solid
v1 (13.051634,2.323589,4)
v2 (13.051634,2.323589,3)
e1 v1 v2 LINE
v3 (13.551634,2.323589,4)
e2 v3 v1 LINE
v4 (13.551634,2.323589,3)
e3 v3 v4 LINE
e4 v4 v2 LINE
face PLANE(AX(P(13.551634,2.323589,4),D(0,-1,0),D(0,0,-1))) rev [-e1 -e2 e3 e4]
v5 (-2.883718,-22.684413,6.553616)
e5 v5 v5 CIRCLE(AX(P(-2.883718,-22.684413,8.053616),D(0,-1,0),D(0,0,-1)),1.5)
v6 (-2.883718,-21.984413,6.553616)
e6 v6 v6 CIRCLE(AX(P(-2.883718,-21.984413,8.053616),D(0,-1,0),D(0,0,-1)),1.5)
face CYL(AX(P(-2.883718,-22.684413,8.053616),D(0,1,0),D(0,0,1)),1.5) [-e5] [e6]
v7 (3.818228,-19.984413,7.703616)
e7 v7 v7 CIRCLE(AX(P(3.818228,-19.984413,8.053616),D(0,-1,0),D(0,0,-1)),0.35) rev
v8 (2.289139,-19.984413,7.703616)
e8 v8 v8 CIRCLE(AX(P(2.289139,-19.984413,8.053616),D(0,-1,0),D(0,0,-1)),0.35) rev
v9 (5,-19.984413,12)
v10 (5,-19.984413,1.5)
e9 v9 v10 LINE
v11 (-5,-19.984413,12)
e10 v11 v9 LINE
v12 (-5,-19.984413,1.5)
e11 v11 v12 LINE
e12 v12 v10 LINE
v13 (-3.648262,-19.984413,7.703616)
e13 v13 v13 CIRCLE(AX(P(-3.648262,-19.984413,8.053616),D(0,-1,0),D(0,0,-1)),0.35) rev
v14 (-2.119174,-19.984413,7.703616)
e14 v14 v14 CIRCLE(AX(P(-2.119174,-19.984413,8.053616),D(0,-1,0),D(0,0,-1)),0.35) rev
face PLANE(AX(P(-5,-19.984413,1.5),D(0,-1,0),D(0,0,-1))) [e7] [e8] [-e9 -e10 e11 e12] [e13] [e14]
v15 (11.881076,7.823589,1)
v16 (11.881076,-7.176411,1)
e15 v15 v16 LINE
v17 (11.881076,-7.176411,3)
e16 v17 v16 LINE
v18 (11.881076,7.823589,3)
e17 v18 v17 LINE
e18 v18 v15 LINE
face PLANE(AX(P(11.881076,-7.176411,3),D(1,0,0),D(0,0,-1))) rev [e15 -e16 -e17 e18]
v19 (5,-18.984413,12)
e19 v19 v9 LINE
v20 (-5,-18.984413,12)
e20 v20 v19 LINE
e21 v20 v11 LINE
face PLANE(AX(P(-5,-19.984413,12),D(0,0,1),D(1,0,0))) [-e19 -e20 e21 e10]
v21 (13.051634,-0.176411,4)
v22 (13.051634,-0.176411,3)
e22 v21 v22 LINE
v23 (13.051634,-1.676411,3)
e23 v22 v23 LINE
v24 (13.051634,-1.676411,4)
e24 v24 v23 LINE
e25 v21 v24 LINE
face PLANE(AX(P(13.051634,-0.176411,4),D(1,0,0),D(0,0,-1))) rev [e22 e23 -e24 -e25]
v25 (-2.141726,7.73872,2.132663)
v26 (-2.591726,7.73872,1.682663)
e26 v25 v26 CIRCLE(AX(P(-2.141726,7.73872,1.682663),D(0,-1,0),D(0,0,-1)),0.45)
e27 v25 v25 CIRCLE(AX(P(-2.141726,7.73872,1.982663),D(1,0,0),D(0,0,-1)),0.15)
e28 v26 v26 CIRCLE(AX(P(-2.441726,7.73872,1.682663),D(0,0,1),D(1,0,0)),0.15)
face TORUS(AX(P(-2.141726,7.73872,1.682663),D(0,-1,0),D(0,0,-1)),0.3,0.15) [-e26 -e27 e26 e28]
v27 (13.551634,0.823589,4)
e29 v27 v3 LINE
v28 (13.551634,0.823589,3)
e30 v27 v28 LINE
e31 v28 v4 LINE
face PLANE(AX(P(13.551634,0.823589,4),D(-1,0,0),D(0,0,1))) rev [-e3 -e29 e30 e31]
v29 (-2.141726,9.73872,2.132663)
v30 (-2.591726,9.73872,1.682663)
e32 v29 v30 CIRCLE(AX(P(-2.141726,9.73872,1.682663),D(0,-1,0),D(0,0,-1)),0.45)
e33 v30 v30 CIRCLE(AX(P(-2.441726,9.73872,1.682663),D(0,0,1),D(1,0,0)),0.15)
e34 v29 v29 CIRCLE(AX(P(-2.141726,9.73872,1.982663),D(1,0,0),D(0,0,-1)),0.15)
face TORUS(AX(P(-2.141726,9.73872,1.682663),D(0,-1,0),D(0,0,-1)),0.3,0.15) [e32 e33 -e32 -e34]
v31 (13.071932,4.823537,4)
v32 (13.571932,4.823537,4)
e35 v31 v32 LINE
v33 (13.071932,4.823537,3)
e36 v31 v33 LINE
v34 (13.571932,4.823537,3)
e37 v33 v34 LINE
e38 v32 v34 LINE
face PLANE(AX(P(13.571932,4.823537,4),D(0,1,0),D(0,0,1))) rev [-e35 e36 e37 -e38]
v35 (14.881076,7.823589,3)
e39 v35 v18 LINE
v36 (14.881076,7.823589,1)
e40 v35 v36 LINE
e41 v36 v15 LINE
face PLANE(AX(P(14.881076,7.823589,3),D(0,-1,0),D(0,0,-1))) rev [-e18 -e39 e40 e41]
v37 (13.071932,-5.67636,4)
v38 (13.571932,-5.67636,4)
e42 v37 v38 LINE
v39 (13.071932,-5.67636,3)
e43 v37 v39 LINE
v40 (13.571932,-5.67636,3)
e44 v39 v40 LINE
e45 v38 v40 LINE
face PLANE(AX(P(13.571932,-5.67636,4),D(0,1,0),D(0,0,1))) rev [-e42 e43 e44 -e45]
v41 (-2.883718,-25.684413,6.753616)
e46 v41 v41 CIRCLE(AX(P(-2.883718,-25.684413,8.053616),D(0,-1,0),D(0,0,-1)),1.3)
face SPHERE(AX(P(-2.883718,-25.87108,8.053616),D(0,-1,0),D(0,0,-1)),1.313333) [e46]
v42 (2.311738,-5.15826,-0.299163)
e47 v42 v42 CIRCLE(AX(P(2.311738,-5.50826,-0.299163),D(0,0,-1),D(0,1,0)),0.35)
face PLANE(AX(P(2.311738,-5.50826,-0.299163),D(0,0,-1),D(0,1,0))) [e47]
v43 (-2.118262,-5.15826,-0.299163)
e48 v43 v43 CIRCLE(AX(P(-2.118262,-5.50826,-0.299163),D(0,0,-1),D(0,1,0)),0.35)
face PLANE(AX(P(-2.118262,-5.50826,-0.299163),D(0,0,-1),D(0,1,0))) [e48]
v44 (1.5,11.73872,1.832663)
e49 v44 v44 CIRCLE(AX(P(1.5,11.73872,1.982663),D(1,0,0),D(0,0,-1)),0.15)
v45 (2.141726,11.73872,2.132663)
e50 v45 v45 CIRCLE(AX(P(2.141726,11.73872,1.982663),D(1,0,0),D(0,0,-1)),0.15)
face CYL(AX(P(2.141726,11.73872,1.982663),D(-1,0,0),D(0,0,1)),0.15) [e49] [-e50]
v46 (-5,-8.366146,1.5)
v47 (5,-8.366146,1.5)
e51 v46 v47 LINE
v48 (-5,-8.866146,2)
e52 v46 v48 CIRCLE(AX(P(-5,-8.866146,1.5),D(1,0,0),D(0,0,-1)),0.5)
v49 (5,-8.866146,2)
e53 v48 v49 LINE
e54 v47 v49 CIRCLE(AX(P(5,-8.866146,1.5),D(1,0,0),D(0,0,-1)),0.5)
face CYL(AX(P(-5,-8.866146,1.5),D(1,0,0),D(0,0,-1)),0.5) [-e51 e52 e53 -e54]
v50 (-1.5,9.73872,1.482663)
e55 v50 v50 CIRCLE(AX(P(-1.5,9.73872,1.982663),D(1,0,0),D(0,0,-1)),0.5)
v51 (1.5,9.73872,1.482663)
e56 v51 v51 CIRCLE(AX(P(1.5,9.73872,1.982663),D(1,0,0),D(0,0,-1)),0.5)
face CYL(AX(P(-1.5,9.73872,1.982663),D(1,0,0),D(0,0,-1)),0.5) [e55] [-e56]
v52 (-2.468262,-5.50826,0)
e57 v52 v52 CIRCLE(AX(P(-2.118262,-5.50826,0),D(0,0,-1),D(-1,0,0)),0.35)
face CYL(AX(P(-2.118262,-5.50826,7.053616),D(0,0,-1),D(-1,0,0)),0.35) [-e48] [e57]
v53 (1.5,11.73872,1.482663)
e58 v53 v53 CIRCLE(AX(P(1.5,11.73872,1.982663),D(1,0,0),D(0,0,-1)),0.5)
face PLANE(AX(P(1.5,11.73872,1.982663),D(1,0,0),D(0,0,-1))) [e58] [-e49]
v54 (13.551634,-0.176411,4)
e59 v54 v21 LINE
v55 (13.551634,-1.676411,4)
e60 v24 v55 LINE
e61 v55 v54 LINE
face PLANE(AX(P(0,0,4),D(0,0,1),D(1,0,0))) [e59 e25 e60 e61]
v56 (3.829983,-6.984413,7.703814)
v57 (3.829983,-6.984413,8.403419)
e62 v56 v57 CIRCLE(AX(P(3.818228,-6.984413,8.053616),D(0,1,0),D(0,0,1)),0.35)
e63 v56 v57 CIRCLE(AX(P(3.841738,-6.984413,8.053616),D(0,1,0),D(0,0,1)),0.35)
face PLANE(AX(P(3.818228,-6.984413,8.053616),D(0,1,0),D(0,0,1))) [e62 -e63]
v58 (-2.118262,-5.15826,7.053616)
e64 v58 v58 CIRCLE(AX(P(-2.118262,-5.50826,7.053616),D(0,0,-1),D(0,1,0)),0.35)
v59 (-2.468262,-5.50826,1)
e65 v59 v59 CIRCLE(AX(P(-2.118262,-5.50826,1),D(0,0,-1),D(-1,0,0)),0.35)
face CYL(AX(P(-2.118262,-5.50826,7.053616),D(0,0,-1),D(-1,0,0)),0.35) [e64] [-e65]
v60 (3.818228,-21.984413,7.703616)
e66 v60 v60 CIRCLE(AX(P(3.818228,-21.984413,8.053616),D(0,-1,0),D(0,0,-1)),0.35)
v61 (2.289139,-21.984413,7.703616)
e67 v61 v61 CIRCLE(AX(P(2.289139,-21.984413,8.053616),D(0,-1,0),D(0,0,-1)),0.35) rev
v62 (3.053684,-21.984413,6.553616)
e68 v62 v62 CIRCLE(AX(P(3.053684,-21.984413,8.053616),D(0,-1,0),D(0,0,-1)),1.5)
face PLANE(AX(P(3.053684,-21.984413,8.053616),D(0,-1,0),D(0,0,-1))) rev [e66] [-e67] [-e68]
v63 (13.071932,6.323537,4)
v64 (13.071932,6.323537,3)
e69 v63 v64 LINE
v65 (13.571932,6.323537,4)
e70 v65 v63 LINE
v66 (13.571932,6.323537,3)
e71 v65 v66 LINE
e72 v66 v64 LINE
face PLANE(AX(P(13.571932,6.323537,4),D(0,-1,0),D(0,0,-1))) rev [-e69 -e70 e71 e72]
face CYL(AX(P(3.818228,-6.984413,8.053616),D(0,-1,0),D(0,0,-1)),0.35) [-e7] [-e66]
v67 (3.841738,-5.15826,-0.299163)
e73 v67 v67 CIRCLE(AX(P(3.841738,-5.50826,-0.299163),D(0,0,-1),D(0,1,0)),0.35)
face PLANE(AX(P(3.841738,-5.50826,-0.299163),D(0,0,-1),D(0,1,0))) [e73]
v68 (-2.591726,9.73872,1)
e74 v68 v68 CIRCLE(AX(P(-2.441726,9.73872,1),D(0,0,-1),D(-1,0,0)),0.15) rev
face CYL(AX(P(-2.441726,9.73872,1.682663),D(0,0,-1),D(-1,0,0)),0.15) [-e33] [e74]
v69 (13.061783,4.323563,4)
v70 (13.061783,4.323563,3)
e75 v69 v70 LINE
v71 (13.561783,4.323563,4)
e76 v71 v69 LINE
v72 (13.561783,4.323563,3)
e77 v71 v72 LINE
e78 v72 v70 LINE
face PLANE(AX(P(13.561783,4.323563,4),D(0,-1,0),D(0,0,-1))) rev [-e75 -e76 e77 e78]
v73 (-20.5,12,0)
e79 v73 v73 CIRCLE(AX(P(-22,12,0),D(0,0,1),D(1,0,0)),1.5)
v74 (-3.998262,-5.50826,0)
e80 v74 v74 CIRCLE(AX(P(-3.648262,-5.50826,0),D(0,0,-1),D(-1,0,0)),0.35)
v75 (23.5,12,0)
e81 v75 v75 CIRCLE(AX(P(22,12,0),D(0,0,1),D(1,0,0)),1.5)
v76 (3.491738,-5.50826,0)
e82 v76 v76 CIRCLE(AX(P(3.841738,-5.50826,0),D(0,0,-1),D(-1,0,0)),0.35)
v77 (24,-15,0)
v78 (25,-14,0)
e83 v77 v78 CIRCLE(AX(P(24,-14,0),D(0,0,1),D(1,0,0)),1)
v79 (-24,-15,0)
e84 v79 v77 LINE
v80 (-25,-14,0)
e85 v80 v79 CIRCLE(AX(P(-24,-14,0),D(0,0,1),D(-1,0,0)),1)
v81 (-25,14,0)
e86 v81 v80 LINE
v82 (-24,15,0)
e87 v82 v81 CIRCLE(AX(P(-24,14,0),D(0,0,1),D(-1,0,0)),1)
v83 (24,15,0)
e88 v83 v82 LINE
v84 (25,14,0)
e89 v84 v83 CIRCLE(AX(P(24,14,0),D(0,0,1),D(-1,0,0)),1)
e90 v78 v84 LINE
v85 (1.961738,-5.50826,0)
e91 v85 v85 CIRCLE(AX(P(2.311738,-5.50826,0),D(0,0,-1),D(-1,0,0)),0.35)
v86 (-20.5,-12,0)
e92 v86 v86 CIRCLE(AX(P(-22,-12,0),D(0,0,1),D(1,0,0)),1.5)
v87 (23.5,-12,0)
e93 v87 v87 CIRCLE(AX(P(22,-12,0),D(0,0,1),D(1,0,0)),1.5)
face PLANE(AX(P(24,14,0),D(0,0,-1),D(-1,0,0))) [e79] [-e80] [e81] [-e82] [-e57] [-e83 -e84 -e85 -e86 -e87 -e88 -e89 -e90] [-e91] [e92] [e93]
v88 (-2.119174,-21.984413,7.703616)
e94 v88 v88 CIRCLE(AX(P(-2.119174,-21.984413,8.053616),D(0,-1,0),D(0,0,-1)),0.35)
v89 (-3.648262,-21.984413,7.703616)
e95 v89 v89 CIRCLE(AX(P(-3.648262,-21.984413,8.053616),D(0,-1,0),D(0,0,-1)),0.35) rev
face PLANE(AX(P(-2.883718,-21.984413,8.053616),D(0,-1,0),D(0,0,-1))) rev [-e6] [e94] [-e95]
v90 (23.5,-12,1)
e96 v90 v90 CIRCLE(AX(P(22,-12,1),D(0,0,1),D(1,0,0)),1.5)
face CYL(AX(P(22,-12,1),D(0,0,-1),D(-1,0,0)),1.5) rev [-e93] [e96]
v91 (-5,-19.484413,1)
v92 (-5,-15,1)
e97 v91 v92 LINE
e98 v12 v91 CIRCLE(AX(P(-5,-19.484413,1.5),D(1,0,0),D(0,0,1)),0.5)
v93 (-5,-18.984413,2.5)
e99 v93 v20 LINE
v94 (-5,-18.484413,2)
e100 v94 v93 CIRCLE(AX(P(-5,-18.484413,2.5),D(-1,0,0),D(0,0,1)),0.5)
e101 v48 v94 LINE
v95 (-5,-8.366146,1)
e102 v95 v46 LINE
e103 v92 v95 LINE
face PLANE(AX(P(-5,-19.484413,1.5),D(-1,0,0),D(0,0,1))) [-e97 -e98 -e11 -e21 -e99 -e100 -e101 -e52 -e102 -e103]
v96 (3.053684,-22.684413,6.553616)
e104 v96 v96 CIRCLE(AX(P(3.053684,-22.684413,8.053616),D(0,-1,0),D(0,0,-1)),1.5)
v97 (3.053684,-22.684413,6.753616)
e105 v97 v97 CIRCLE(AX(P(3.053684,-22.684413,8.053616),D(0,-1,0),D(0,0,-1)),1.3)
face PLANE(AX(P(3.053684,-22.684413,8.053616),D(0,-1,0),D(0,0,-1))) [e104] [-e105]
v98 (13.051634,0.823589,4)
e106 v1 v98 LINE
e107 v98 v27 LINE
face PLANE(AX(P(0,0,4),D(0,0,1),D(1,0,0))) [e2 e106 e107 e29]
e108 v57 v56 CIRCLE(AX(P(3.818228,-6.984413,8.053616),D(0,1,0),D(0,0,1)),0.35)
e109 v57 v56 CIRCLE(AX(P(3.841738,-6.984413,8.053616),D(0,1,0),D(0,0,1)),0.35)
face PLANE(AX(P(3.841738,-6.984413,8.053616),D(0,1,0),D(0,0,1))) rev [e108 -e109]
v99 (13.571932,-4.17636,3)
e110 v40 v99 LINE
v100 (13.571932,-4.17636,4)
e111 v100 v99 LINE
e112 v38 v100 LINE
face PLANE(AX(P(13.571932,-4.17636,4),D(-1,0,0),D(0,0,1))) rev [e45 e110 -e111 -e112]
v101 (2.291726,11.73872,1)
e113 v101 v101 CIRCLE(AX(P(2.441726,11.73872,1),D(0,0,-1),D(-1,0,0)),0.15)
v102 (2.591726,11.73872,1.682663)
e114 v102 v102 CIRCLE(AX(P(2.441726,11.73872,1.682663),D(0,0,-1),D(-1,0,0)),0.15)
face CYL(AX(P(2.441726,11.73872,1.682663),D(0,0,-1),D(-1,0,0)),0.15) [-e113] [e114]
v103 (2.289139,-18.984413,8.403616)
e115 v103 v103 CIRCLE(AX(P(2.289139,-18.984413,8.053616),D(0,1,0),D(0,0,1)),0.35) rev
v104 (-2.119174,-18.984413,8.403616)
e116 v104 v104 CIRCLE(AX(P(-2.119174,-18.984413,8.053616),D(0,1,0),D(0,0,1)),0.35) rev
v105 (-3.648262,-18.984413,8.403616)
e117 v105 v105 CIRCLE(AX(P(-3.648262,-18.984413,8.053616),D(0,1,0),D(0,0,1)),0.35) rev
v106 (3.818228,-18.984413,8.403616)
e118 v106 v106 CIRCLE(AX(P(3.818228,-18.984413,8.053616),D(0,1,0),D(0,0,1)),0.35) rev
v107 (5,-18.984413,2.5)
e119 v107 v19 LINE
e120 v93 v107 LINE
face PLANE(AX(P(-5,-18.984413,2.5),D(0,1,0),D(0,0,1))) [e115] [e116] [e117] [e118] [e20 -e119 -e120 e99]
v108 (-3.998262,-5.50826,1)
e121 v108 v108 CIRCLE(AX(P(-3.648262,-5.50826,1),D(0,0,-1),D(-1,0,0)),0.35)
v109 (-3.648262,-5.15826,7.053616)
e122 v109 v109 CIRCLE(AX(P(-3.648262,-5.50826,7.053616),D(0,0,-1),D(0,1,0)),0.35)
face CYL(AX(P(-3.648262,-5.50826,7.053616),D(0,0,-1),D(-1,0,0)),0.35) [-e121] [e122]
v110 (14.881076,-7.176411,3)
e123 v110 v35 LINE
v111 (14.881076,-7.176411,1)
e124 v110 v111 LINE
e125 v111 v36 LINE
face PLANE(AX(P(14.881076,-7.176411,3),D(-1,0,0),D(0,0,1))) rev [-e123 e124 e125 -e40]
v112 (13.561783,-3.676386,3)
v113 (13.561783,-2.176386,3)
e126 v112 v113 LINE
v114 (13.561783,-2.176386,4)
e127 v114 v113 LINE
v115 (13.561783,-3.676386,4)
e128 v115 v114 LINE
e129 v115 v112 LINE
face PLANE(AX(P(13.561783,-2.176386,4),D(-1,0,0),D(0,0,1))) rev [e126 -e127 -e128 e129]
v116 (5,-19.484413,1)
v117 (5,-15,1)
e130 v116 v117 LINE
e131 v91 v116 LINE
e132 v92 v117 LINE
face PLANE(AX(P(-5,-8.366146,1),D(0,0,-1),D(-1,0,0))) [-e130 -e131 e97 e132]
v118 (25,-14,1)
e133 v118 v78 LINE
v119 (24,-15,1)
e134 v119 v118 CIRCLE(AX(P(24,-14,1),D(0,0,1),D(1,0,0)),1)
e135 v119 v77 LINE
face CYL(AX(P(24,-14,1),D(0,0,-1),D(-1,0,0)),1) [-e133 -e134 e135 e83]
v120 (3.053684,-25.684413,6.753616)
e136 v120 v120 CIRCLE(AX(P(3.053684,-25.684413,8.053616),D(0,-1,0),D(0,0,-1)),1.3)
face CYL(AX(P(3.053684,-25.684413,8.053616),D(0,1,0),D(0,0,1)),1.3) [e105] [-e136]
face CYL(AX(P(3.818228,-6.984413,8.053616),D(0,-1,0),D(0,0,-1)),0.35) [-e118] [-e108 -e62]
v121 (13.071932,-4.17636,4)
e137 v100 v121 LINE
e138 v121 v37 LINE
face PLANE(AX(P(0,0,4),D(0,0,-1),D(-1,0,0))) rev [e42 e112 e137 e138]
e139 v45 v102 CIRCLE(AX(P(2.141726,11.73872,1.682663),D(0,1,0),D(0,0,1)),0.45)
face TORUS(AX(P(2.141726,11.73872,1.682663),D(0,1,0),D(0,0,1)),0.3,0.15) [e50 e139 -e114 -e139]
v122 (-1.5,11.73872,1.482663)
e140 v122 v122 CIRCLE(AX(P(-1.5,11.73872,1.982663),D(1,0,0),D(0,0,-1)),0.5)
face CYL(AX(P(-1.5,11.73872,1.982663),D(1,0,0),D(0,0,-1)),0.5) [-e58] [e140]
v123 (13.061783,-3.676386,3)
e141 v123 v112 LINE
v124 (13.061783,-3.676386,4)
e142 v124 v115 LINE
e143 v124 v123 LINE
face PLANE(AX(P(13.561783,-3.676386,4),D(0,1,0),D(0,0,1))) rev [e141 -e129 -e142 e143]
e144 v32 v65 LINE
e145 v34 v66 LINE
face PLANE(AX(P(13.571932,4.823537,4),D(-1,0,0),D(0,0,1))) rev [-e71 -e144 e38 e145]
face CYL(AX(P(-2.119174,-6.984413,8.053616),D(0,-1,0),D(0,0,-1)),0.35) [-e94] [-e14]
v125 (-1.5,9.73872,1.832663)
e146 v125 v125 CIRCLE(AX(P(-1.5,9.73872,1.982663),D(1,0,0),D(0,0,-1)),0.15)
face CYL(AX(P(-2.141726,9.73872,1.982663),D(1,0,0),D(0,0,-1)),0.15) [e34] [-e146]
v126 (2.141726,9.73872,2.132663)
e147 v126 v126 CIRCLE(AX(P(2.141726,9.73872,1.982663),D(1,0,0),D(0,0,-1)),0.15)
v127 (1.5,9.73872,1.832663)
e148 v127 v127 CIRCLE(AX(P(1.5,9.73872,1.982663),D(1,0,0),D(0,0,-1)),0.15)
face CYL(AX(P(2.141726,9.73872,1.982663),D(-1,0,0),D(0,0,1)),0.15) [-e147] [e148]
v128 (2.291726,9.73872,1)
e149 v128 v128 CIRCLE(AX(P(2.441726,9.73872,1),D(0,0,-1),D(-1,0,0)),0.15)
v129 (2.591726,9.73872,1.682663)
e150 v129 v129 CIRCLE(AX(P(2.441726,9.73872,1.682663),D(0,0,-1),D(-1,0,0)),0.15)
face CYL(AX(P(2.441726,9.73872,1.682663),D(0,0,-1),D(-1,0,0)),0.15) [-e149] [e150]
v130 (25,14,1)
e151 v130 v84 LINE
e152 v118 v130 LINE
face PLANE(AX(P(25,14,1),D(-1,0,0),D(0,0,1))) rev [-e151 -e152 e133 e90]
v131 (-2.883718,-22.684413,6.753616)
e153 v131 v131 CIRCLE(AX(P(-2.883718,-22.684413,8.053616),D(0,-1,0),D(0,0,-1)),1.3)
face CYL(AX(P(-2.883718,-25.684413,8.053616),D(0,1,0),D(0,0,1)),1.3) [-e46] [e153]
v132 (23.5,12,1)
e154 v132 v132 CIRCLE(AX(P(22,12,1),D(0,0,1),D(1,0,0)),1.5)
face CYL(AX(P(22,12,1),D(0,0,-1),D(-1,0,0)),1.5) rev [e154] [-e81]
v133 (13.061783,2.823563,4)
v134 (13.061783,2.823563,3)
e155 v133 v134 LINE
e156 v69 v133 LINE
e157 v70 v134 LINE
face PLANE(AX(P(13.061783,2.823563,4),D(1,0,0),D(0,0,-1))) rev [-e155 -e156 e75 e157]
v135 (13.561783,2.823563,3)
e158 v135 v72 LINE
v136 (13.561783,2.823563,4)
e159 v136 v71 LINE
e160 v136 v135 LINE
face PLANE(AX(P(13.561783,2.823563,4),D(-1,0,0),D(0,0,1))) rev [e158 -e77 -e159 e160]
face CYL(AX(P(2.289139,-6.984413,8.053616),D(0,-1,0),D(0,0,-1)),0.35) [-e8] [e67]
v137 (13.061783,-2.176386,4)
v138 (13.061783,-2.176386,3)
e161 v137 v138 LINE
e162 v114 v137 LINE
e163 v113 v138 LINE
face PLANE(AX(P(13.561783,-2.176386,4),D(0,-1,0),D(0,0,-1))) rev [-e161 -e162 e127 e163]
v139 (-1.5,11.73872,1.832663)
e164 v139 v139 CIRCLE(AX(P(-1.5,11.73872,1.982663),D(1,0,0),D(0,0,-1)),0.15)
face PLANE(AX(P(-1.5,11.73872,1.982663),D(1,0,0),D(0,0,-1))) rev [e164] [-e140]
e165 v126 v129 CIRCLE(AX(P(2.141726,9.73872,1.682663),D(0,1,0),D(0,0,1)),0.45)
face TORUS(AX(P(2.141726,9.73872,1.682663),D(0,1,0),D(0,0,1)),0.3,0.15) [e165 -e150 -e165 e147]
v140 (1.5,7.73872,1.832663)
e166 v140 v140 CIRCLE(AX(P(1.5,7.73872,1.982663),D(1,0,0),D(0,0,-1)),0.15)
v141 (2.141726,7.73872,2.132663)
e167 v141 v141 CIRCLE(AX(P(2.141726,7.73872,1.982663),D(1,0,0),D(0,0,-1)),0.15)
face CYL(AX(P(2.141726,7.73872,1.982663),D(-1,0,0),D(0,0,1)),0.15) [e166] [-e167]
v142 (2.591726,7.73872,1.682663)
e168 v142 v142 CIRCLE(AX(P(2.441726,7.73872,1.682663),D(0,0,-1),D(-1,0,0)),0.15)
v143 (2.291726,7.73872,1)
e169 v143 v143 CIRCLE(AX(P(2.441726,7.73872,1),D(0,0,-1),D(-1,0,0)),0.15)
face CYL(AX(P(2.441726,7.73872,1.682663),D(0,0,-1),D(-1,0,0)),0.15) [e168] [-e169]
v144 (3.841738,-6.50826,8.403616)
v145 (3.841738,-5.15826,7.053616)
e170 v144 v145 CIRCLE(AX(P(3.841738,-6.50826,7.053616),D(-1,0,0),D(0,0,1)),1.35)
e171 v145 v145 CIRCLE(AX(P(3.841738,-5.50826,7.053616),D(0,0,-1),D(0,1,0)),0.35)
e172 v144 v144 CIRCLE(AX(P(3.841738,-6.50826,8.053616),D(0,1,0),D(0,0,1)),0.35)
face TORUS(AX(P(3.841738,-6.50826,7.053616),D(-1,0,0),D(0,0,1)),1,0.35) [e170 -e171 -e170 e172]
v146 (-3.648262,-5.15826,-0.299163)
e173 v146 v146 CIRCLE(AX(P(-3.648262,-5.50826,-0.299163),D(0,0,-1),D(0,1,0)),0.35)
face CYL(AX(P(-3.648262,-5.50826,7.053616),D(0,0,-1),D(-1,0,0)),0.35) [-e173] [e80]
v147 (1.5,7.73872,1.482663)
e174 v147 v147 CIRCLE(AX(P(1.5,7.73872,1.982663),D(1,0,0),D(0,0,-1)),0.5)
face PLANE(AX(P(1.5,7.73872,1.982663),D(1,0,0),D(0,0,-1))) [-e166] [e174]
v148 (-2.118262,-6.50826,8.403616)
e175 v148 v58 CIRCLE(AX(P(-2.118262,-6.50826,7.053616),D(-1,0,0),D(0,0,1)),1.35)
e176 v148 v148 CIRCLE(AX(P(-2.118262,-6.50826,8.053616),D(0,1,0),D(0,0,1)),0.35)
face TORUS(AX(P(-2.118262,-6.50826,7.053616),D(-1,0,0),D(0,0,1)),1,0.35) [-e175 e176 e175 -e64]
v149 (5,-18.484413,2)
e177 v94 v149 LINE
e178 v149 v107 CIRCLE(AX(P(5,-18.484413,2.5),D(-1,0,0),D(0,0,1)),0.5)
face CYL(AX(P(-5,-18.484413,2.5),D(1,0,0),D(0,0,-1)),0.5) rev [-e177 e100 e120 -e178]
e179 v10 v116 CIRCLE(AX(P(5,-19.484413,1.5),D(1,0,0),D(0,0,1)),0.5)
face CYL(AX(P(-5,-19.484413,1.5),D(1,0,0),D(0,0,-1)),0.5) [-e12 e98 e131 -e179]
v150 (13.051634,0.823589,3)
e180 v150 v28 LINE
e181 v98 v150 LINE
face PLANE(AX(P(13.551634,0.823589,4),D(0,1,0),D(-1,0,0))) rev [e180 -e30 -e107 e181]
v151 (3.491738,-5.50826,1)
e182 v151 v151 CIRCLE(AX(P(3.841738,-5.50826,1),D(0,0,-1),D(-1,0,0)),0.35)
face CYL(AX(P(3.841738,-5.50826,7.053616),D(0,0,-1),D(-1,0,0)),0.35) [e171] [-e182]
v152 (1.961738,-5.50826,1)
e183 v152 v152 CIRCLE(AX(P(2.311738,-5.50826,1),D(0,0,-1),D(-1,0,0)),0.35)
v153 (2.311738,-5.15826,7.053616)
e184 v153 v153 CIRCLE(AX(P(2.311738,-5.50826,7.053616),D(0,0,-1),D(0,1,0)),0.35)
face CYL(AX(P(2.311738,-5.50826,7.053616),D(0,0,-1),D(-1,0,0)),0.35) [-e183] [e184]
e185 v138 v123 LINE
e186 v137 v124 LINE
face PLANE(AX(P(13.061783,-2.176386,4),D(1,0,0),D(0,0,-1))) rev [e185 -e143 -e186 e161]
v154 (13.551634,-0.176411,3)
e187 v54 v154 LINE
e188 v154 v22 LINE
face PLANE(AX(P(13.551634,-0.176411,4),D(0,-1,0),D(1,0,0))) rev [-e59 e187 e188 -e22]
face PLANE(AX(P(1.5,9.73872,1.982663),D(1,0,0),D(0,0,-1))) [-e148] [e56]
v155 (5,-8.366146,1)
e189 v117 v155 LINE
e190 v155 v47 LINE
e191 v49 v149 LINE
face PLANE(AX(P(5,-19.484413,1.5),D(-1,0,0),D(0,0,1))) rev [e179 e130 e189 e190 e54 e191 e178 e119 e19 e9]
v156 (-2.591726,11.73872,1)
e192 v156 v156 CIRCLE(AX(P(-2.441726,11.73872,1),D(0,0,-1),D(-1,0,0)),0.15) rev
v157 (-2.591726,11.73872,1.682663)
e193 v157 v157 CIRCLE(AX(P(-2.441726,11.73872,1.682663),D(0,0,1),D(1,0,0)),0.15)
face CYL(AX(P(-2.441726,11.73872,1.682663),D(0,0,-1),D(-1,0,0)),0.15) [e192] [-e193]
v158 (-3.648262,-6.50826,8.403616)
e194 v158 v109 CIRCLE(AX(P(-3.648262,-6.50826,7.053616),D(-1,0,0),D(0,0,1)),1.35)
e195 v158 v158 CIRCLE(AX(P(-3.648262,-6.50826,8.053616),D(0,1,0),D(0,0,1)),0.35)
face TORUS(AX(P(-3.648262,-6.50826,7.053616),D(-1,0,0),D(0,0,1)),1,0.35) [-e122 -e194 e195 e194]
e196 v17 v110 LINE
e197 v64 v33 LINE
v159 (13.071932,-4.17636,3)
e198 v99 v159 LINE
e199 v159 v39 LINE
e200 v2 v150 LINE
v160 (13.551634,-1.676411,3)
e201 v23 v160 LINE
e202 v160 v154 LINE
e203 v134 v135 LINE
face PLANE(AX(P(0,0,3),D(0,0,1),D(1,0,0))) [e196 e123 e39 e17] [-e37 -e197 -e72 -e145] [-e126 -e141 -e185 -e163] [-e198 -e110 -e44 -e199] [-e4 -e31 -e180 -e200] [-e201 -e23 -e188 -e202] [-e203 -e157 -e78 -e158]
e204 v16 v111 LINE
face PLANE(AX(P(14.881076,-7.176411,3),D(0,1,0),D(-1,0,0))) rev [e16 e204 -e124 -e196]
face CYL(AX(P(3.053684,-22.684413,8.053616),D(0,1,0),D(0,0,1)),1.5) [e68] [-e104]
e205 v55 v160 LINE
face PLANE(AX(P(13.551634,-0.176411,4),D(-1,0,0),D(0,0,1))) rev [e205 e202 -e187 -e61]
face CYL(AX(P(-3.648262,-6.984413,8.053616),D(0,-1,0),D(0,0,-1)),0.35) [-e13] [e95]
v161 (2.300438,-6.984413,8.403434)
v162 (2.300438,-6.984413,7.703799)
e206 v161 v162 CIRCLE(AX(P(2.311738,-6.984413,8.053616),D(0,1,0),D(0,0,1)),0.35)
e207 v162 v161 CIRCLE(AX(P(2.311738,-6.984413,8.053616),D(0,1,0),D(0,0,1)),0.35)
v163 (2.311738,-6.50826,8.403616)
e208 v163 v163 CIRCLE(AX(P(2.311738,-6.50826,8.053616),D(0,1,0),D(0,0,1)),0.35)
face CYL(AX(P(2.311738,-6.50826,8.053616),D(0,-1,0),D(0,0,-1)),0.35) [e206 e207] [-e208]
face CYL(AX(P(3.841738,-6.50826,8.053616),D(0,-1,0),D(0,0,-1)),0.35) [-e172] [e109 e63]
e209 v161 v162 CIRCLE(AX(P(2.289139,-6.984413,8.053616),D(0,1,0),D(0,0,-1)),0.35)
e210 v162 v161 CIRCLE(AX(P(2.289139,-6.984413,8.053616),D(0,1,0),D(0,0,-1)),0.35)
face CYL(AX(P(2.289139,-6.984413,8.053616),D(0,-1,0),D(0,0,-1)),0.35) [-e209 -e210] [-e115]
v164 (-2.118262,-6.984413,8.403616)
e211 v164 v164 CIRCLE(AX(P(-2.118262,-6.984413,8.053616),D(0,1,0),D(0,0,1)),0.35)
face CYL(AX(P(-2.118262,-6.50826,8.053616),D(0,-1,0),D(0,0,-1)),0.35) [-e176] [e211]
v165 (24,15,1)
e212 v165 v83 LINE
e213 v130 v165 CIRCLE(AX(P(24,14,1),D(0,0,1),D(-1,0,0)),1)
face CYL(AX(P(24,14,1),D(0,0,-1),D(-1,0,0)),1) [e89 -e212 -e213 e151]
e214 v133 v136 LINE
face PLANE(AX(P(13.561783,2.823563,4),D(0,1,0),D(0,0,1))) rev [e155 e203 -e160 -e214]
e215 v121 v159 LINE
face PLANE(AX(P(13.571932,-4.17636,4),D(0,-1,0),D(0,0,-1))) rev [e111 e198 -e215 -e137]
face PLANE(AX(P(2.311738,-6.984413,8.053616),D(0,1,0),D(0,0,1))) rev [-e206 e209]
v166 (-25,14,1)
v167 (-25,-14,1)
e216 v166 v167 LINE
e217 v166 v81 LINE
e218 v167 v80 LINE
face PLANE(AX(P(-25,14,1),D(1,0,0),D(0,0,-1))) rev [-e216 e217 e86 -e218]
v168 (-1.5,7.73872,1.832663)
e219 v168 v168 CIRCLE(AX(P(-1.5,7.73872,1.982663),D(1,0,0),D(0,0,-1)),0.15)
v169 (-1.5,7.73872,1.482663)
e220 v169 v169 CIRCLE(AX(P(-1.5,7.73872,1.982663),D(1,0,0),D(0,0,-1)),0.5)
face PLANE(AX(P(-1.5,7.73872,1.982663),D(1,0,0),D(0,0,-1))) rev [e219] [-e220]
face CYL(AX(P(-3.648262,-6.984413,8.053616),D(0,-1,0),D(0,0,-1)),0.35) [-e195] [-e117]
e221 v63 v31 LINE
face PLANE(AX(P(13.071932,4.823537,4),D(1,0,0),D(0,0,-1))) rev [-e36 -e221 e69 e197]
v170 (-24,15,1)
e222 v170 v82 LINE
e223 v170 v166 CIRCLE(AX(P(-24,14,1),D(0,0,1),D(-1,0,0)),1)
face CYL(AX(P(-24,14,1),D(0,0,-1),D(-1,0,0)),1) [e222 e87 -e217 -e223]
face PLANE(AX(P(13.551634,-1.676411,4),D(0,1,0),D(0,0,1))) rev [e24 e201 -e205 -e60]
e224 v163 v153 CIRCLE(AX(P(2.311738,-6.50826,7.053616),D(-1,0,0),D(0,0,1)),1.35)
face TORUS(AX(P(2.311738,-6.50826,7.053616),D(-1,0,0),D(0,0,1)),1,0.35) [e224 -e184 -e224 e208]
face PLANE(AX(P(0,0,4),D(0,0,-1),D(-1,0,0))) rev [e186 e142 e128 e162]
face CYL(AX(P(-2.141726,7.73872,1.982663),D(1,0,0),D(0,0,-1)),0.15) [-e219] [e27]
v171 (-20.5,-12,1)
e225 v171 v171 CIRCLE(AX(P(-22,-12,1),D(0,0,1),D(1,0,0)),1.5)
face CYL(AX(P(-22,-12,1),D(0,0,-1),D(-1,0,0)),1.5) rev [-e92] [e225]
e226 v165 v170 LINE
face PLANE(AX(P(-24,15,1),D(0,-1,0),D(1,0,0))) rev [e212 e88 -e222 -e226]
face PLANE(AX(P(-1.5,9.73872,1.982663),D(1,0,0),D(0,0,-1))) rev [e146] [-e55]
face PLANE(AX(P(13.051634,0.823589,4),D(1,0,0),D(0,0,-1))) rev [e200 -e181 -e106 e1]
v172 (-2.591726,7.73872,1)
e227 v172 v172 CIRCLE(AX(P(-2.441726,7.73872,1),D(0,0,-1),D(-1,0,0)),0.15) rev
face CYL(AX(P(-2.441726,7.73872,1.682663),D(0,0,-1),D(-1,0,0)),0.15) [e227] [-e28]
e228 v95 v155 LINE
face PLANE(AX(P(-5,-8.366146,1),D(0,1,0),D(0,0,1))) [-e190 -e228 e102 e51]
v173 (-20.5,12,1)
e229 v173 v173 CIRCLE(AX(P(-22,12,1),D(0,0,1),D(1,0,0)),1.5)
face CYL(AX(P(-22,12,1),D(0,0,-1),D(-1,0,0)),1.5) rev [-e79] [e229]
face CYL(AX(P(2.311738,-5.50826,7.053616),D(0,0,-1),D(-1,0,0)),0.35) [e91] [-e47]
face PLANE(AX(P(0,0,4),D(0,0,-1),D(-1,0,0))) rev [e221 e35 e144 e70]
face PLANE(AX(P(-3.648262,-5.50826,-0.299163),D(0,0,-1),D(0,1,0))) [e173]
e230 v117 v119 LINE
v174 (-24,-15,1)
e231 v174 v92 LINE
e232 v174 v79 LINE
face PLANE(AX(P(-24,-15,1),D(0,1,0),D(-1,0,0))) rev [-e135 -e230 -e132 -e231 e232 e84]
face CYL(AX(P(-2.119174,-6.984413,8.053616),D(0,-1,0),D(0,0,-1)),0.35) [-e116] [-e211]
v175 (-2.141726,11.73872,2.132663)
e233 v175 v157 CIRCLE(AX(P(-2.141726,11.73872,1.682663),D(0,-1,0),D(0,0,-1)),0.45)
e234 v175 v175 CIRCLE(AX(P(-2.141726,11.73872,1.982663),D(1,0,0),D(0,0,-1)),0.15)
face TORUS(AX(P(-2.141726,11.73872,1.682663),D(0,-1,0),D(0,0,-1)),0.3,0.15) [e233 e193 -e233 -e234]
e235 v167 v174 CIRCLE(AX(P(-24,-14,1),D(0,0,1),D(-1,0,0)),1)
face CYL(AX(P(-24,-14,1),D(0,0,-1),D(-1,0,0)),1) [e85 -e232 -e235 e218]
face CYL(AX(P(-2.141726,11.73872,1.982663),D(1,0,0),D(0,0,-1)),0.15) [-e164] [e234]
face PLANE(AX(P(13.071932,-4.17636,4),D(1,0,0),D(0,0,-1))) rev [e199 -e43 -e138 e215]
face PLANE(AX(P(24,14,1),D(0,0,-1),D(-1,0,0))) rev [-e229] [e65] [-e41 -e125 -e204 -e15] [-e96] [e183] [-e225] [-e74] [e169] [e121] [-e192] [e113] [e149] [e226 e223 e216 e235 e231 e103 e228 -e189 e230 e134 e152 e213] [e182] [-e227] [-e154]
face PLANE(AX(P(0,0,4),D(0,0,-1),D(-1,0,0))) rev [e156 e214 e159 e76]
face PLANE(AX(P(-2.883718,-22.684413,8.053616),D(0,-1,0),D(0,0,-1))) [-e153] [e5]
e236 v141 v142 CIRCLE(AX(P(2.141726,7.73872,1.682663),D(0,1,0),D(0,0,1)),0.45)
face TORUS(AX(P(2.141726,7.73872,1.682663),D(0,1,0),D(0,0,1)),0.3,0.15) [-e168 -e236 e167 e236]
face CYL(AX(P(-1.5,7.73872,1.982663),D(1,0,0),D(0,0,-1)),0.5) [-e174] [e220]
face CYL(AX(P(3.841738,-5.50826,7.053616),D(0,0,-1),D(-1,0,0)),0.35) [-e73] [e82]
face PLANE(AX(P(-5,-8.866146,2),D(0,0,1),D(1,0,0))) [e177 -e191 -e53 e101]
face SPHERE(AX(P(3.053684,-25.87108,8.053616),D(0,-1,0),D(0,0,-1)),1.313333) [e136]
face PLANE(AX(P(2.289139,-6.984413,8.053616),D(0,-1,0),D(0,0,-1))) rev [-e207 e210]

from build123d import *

# Parameters (mm, degrees)
ESQUISSE1_R                          = 1.5
BOSS_EXTRU_1_DEPTH                   = 1
BOSS_EXTRU_2_DEPTH                   = 5
BOSS_EXTRU_2_DEPTH_BACK              = 5
BOSS_EXTRU_3_START                   = 2
ESQUISSE3_R                          = 1.5
BOSS_EXTRU_3_DEPTH                   = 0.7
BOSS_EXTRU_3_2_DEPTH                 = 0.7
ESQUISSE4_R                          = 1.3
BOSS_EXTRU_4_DEPTH                   = 3
ESQUISSE5_R                          = 0.35
BOSS_EXTRU_5_DEPTH                   = 15
ESQUISSE6_R                          = 0.35
R_P_TITION_LIN_AIRE1_COUNT           = 2
R_P_TITION_LIN_AIRE1_PITCH           = 1.53
R_P_TITION_LIN_AIRE2_COUNT           = 2
R_P_TITION_LIN_AIRE2_PITCH           = 5.96
R_P_TITION_LIN_AIRE2_COPY_1_SKETCH_R = 0.35
ESQUISSE7_W                          = 3
ESQUISSE7_H                          = 15
BOSS_EXTRU_6_DEPTH                   = 2
ESQUISSE8_W                          = 0.5
ESQUISSE8_H                          = 1.5
BOSS_EXTRU_7_DEPTH                   = 1
ESQUISSE9_R                          = 0.5
BOSS_EXTRU_8_DEPTH                   = 1.5
ESQUISSE10_R                         = 0.15
R_P_TITION_LIN_AIRE3_COUNT           = 3
R_P_TITION_LIN_AIRE3_PITCH           = 2
R_P_TITION_LIN_AIRE3_COPY_1_SKETCH_R = 0.15
R_P_TITION_LIN_AIRE3_COPY_2_SKETCH_R = 0.15
R_P_TITION_LIN_AIRE4_COUNT           = 3
R_P_TITION_LIN_AIRE4_PITCH           = 2


# Read off the part's stored shape, not the designer's step: Dôme1, Dôme2
with BuildPart() as part:
    # Esquisse1 → Boss.-Extru.1 (new body)
    with BuildSketch(Plane.XY):
        with BuildLine():
            Line((-24, 15), (24, 15))
            ThreePointArc((24, 15), (24.707106781, 14.707106781), (25, 14))
            Line((25, 14), (25, -14))
            ThreePointArc((25, -14), (24.707106781, -14.707106781), (24, -15))
            Line((24, -15), (-24, -15))
            ThreePointArc((-24, -15), (-24.707106781, -14.707106781), (-25, -14))
            Line((-25, -14), (-25, 14))
            ThreePointArc((-25, 14), (-24.707106781, 14.707106781), (-24, 15))
        make_face()
        with Locations((-22, 12)):
            Circle(ESQUISSE1_R, mode=Mode.SUBTRACT)
        with Locations((22, 12)):
            Circle(ESQUISSE1_R, mode=Mode.SUBTRACT)
        with Locations((22, -12)):
            Circle(ESQUISSE1_R, mode=Mode.SUBTRACT)
        with Locations((-22, -12)):
            Circle(ESQUISSE1_R, mode=Mode.SUBTRACT)
    extrude(amount=BOSS_EXTRU_1_DEPTH)

    # Esquisse2 → Boss.-Extru.2 (add, two sides: drawn at the far end of the back side and taken through both)
    with BuildSketch(Plane(origin=(0, 0, 0), x_dir=(0, 0, -1), z_dir=(1, 0, 0)).offset(-BOSS_EXTRU_2_DEPTH_BACK)):
        with BuildLine():
            Line((-1, -8.366145722), (-1.5, -8.366145722))
            ThreePointArc((-1.5, -8.366145722), (-1.853553391, -8.512592331), (-2, -8.866145722))
            Line((-2, -8.866145722), (-2, -18.484413371))
            ThreePointArc((-2, -18.484413371), (-2.146446609, -18.837966761), (-2.5, -18.984413371))
            Line((-2.5, -18.984413371), (-12, -18.984413371))
            Line((-12, -18.984413371), (-12, -19.984413371))
            Line((-12, -19.984413371), (-2, -19.984413371))
            Line((-2, -19.984413371), (-1.5, -19.984413371))
            ThreePointArc((-1.5, -19.984413371), (-1.146446609, -19.837966761), (-1, -19.484413371))
            Line((-1, -19.484413371), (-1, -8.366145722))
        make_face()
    extrude(amount=BOSS_EXTRU_2_DEPTH + BOSS_EXTRU_2_DEPTH_BACK)



with BuildPart() as body_2:
    # Esquisse3 → Boss.-Extru.3 (new body)
    with BuildSketch(Plane.XZ.offset(19.984413371).offset(BOSS_EXTRU_3_START)):
        with Locations(Location((-2.883718091, 8.053616468, 0), (0, 0, 270))):
            Circle(ESQUISSE3_R)
    extrude(amount=BOSS_EXTRU_3_DEPTH)



with BuildPart() as body_3:
    # Esquisse3 → Boss.-Extru.3 2 (new body)
    with BuildSketch(Plane.XZ.offset(19.984413371).offset(BOSS_EXTRU_3_START)):
        with Locations(Location((3.053683826, 8.053616468, 0), (0, 0, 270))):
            Circle(ESQUISSE3_R)
    extrude(amount=BOSS_EXTRU_3_2_DEPTH)


with BuildPart() as body_2_1:
    add(body_2.part)

    add(body_3.part)  # Boss.-Extru.4 merges body 3
    # Esquisse4 → Boss.-Extru.4 (add)
    with BuildSketch(Plane.XZ.offset(22.684413371)):
        with Locations(Location((-2.883718091, 8.053616468, 0), (0, 0, 270))):
            Circle(ESQUISSE4_R)
        with Locations(Location((3.053683826, 8.053616468, 0), (0, 0, 270))):
            Circle(ESQUISSE4_R)
    extrude(amount=BOSS_EXTRU_4_DEPTH)

    # Dôme1 outline → Dôme1 (revolve)
    with BuildSketch(Plane(origin=(3.053683826, 0, 8.053616468), x_dir=(1, 0, 0), z_dir=(0, 0, 1))):
        with BuildLine():
            Line((0, -25.684413369), (0, -27.184413371))
            ThreePointArc((0, -27.184413371), (0.992471662, -26.731222144), (1.3, -25.68441337))
            Line((1.3, -25.68441337), (0, -25.684413369))
        make_face()
    revolve(axis=Axis((3.053683826, 0, 8.053616468), (0, 1, 0)))

    # Dôme2 outline → Dôme2 (revolve)
    with BuildSketch(Plane(origin=(-2.883718091, 0, 8.053616468), x_dir=(1, 0, 0), z_dir=(0, 0, 1))):
        with BuildLine():
            Line((0, -25.684413369), (0, -27.184413371))
            ThreePointArc((0, -27.184413371), (0.992471662, -26.731222144), (1.3, -25.68441337))
            Line((1.3, -25.68441337), (0, -25.684413369))
        make_face()
    revolve(axis=Axis((-2.883718091, 0, 8.053616468), (0, 1, 0)))


with BuildPart() as part_1:
    add(part.part)

    add(body_2_1.part)  # Boss.-Extru.5 merges body 2
    # Esquisse5 → Boss.-Extru.5 (add)
    with BuildSketch(Plane(origin=(0, -21.984413371, 0), x_dir=(1, 0, 0), z_dir=(0, 1, 0))):
        with Locations(Location((-2.119173686, -8.053616468, 0), (0, 0, 270))):
            Circle(ESQUISSE5_R)
        with Locations(Location((-3.648262497, -8.053616468, 0), (0, 0, 90))):
            Circle(ESQUISSE5_R)
        with Locations(Location((3.818228231, -8.053616468, 0), (0, 0, 270))):
            Circle(ESQUISSE5_R)
        with Locations(Location((2.289139421, -8.053616468, 0), (0, 0, 90))):
            Circle(ESQUISSE5_R)
    extrude(amount=BOSS_EXTRU_5_DEPTH)

    # Balayage1: sweep along a curve in space
    with BuildLine() as balayage1_path:
        Line((-3.648262497, -6.984413371, 8.053616468), (-3.648262497, -6.50826016, 8.053616468))
        ThreePointArc((-3.648262497, -6.50826016, 8.053616468), (-3.648262497, -5.801153379, 7.760723249), (-3.648262497, -5.50826016, 7.053616468))
        Line((-3.648262497, -5.50826016, 7.053616468), (-3.648262497, -5.50826016, -0.299163355))
    # Esquisse6 → Balayage1 (sweep)
    with BuildSketch(Plane(origin=(0, -6.984413371, 0), x_dir=(1, 0, 0), z_dir=(0, 1, 0))):
        with Locations((-3.648262497, -8.053616468)):
            Circle(ESQUISSE6_R)
    balayage1 = sweep(path=balayage1_path.line)

    # Répétition linéaire1: Balayage1 ×2
    with Locations(*[(i * R_P_TITION_LIN_AIRE1_PITCH, 0, 0) for i in range(1, R_P_TITION_LIN_AIRE1_COUNT)]):
        add(balayage1)

    # Répétition linéaire2: Balayage1 ×2
    with Locations(*[(i * R_P_TITION_LIN_AIRE2_PITCH, 0, 0) for i in range(1, R_P_TITION_LIN_AIRE2_COUNT)]):
        add(balayage1)

    # Répétition linéaire2 copy 1: sweep along a curve in space
    with BuildLine() as r_p_tition_lin_aire2_copy_1_path:
        Line((3.841737503, -6.984413371, 8.053616468), (3.841737503, -6.50826016, 8.053616468))
        ThreePointArc((3.841737503, -6.50826016, 8.053616468), (3.841737503, -5.801153379, 7.760723249), (3.841737503, -5.50826016, 7.053616468))
        Line((3.841737503, -5.50826016, 7.053616468), (3.841737503, -5.50826016, -0.299163355))
    # Répétition linéaire2 copy 1 sketch → Répétition linéaire2 copy 1 (sweep)
    with BuildSketch(Plane(origin=(7.49, -6.984413371, 0), x_dir=(1, 0, 0), z_dir=(0, 1, 0))):
        with Locations((-3.648262497, -8.053616468)):
            Circle(R_P_TITION_LIN_AIRE2_COPY_1_SKETCH_R)
    sweep(path=r_p_tition_lin_aire2_copy_1_path.line)

    # Esquisse7 → Boss.-Extru.6 (add)
    with BuildSketch(Plane.XY.offset(1)):
        with Locations((13.381076473, 0.323588618)):
            Rectangle(ESQUISSE7_W, ESQUISSE7_H)
    extrude(amount=BOSS_EXTRU_6_DEPTH)

    # Esquisse8 → Boss.-Extru.7 (add)
    with BuildSketch(Plane.XY.offset(3)):
        with Locations((13.30163416, 1.573588618)):
            Rectangle(ESQUISSE8_W, ESQUISSE8_H)
        with Locations((13.3117829, 3.573562868)):
            Rectangle(ESQUISSE8_W, ESQUISSE8_H)
        with Locations((13.32193164, 5.573537119)):
            Rectangle(ESQUISSE8_W, ESQUISSE8_H)
        with Locations((13.32193164, -4.926359884)):
            Rectangle(ESQUISSE8_W, ESQUISSE8_H)
        with Locations((13.3117829, -2.926385633)):
            Rectangle(ESQUISSE8_W, ESQUISSE8_H)
        with Locations((13.30163416, -0.926411382)):
            Rectangle(ESQUISSE8_W, ESQUISSE8_H)
    extrude(amount=BOSS_EXTRU_7_DEPTH)



with BuildPart() as body_2_2:
    # Esquisse9 → Boss.-Extru.8 (new, symmetric)
    with BuildSketch(Plane(origin=(0, 0, 0), x_dir=(0, 0, -1), z_dir=(1, 0, 0))):
        with Locations((-1.982663386, 11.738719875)):
            Circle(ESQUISSE9_R)
    boss_extru_8 = extrude(amount=BOSS_EXTRU_8_DEPTH, both=True)


with BuildPart() as part_2:
    add(part_1.part)

    add(body_2_2.part)  # Balayage2 merges body 2 2
    # Balayage2: sweep along a curve in space
    with BuildLine() as balayage2_path:
        Line((1.5, 11.738719875, 1.982663386), (2.141725899, 11.738719875, 1.982663386))
        ThreePointArc((2.141725899, 11.738719875, 1.982663386), (2.353857933, 11.738719875, 1.89479542), (2.441725899, 11.738719875, 1.682663386))
        Line((2.441725899, 11.738719875, 1.682663386), (2.441725899, 11.738719875, 0.931388588))
    # Esquisse10 → Balayage2 (sweep)
    with BuildSketch(Plane(origin=(1.5, 0, 0), x_dir=(0, 0, -1), z_dir=(1, 0, 0))):
        with Locations((-1.982663386, 11.738719875)):
            Circle(ESQUISSE10_R)
    balayage2 = sweep(path=balayage2_path.line)

    # Symétrie1: Balayage2 across plane
    add(balayage2.mirror(Plane(origin=(0, 0, 0), x_dir=(0, 0, 1), z_dir=(1, 0, 0))))

    # Répétition linéaire3: Balayage2 ×3
    with Locations(*[(0, -i * R_P_TITION_LIN_AIRE3_PITCH, 0) for i in range(1, R_P_TITION_LIN_AIRE3_COUNT)]):
        add(balayage2)

    # Répétition linéaire3 copy 1: sweep along a curve in space
    with BuildLine() as r_p_tition_lin_aire3_copy_1_path:
        Line((-1.5, 9.738719875, 1.982663386), (-2.141725899, 9.738719875, 1.982663386))
        ThreePointArc((-2.141725899, 9.738719875, 1.982663386), (-2.353857933, 9.738719875, 1.89479542), (-2.441725899, 9.738719875, 1.682663386))
        Line((-2.441725899, 9.738719875, 1.682663386), (-2.441725899, 9.738719875, 0.931388588))
    # Répétition linéaire3 copy 1 sketch → Répétition linéaire3 copy 1 (sweep)
    with BuildSketch(Plane(origin=(-1.5, -2, 0), x_dir=(0, 0, -1), z_dir=(-1, 0, 0))):
        with Locations((-1.982663386, -11.738719875)):
            Circle(R_P_TITION_LIN_AIRE3_COPY_1_SKETCH_R)
    sweep(path=r_p_tition_lin_aire3_copy_1_path.line)

    # Répétition linéaire3 copy 2: sweep along a curve in space
    with BuildLine() as r_p_tition_lin_aire3_copy_2_path:
        Line((-1.5, 7.738719875, 1.982663386), (-2.141725899, 7.738719875, 1.982663386))
        ThreePointArc((-2.141725899, 7.738719875, 1.982663386), (-2.353857933, 7.738719875, 1.89479542), (-2.441725899, 7.738719875, 1.682663386))
        Line((-2.441725899, 7.738719875, 1.682663386), (-2.441725899, 7.738719875, 0.931388588))
    # Répétition linéaire3 copy 2 sketch → Répétition linéaire3 copy 2 (sweep)
    with BuildSketch(Plane(origin=(-1.5, -4, 0), x_dir=(0, 0, -1), z_dir=(-1, 0, 0))):
        with Locations((-1.982663386, -11.738719875)):
            Circle(R_P_TITION_LIN_AIRE3_COPY_2_SKETCH_R)
    sweep(path=r_p_tition_lin_aire3_copy_2_path.line)

    # Répétition linéaire4: Boss.-Extru.8 ×3
    with Locations(*[(0, -i * R_P_TITION_LIN_AIRE4_PITCH, 0) for i in range(1, R_P_TITION_LIN_AIRE4_COUNT)]):
        add(boss_extru_8)


solid = part_2.part
